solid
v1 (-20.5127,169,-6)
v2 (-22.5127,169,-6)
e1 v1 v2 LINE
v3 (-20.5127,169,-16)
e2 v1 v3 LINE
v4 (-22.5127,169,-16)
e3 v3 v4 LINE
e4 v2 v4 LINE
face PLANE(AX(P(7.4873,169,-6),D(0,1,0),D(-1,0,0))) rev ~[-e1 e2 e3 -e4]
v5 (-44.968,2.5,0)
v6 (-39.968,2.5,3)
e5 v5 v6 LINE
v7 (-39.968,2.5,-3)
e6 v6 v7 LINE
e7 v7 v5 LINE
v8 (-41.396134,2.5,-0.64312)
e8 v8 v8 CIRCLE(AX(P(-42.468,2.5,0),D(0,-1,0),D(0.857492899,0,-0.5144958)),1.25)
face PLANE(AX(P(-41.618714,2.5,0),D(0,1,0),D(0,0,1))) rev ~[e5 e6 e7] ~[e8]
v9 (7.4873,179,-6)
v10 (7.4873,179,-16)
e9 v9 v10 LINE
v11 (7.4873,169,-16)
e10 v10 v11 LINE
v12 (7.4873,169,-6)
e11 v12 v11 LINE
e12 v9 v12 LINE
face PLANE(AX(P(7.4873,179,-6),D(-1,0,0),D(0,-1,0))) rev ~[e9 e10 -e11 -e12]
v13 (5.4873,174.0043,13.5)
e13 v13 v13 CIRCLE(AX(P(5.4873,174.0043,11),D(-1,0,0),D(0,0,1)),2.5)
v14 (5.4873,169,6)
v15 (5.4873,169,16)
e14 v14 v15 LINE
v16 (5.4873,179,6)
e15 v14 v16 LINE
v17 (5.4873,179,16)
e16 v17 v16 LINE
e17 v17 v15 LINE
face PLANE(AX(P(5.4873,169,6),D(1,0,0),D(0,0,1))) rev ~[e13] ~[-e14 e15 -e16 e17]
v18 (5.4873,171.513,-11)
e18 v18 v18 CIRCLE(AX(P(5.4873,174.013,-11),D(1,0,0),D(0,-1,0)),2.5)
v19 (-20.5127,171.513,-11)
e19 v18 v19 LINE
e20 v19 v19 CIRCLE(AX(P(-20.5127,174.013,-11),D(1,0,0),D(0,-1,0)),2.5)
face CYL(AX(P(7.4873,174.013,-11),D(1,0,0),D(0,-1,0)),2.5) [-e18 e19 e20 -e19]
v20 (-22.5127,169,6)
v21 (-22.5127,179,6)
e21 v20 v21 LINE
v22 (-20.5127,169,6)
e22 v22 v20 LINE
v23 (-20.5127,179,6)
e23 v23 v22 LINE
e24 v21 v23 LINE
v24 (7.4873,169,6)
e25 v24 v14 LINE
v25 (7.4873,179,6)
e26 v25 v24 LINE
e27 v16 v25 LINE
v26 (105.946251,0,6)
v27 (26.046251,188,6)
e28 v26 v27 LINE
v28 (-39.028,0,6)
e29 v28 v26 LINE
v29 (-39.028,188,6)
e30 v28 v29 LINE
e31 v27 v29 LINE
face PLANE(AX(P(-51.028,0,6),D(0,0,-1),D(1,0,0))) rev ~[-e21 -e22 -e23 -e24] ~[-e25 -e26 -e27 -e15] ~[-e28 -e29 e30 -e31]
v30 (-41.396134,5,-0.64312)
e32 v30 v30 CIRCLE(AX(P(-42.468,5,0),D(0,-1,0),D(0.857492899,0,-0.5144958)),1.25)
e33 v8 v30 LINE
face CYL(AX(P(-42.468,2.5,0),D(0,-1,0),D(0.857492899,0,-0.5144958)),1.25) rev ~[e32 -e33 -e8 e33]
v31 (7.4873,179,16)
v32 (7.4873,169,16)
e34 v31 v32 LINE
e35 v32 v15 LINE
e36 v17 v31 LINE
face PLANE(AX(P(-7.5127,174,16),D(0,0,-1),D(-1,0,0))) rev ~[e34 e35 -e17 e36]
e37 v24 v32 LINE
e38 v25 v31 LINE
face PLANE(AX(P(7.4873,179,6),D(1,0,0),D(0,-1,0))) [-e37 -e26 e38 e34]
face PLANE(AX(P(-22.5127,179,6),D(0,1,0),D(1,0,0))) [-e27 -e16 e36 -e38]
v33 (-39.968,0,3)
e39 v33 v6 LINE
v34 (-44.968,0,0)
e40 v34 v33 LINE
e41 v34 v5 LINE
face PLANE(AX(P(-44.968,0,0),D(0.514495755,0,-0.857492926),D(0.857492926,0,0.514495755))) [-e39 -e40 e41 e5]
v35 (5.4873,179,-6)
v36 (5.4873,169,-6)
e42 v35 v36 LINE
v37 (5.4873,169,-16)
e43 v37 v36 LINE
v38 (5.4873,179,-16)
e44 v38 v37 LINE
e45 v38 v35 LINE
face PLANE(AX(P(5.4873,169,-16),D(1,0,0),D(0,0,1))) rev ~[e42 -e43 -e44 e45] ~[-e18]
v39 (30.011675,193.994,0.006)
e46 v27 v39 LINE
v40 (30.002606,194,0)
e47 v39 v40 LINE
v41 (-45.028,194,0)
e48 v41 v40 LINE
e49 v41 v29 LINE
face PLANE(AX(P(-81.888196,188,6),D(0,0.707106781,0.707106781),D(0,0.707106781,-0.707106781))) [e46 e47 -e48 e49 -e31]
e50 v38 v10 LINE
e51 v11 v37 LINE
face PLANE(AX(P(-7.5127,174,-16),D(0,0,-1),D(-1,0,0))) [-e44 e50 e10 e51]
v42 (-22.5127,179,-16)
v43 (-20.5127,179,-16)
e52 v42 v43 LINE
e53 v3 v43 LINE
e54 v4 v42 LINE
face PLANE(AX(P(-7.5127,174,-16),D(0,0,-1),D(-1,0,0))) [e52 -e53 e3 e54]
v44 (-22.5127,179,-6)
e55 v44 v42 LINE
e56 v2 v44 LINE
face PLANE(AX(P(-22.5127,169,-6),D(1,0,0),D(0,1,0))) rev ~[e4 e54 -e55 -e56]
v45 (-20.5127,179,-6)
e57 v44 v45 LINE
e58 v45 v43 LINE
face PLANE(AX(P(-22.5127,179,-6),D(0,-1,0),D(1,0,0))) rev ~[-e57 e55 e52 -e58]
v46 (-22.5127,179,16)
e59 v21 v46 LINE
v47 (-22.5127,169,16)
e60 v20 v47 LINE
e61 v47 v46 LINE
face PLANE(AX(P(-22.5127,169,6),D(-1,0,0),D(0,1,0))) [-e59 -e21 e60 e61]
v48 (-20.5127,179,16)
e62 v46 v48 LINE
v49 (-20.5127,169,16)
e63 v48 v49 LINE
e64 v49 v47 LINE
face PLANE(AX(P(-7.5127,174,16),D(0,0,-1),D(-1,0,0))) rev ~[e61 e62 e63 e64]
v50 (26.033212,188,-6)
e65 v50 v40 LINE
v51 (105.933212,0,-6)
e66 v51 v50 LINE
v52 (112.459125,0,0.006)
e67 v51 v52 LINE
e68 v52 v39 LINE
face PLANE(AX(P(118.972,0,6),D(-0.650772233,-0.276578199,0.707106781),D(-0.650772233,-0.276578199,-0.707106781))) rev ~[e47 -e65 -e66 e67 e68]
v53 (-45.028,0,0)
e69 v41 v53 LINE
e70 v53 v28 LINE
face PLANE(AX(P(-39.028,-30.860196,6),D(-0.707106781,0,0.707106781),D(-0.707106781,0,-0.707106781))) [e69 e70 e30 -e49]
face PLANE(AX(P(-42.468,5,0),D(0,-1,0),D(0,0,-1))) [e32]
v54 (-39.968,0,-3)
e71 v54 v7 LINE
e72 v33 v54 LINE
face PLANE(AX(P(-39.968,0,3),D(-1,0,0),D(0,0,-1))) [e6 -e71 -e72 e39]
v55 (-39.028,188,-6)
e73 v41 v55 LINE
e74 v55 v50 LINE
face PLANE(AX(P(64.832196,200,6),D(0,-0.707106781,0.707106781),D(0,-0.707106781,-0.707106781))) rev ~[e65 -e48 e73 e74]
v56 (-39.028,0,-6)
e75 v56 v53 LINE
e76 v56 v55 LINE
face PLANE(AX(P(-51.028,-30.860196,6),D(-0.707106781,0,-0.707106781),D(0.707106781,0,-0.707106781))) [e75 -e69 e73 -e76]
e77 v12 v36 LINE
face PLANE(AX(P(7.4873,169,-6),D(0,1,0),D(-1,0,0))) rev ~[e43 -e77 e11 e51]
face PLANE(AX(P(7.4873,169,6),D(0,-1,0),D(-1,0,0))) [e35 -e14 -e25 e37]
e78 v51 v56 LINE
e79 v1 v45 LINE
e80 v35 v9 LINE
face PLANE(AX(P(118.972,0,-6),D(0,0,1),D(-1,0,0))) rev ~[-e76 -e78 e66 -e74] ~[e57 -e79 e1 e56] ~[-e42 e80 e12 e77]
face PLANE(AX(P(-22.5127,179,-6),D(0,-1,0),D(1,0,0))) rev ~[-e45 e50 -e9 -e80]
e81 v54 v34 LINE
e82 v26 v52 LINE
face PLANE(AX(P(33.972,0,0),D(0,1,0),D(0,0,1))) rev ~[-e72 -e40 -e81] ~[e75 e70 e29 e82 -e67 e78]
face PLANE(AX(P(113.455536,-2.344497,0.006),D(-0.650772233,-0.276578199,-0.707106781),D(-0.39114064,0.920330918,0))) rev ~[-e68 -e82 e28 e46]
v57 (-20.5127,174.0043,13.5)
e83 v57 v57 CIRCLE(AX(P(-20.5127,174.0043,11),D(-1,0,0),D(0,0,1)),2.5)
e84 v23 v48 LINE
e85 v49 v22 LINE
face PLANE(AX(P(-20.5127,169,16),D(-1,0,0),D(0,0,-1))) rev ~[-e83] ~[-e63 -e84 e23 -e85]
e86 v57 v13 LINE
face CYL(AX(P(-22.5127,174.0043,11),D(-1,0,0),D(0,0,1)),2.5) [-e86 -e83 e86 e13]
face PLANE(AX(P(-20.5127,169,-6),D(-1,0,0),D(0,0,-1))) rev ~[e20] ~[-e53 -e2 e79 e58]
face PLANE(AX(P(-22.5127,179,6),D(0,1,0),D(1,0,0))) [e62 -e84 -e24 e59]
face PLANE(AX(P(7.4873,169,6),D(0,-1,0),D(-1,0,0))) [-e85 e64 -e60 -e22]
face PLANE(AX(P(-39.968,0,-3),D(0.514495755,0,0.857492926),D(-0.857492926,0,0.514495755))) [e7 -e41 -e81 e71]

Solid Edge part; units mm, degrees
sketch "Sketch1" plane through (0, 0, 0) normal (0, -1, 0) x (1, 0, 0)
  line L0 (-51.028, 6) -> (118.972, 6)
  line L1 (118.972, 6) -> (118.972, -6)
  line L2 (118.972, -6) -> (-51.028, -6)
  line L3 (-51.028, -6) -> (-51.028, 6)
extrude "Protrusion1" add sketch "Sketch1" against normal blind 200
sketch "Sketch2" plane through (33.972, 100, 6) normal (0, 0, 1) x (0, 1, 0)
  line L0 (-100, -85) -> (100, 0)
extrude "ExtrudedCutout_3" cut sketch "Sketch2" against normal blind 139.4118 material side at (76.518, 100.0196, 6)
sketch "Sketch3" plane through (33.972, 0, 0) normal (0, -1, 0) x (1, 0, 0)
  line L0 (-73.94, 3) -> (-73.94, -3)
  line L1 (-73.94, -3) -> (-78.94, 0)
  line L2 (-78.94, 0) -> (-73.94, 3)
extrude "ExtrudedCutout_4" cut sketch "Sketch3" against normal blind 2.5
sketch "Sketch4" plane through (-42.468, 2.5, 0) normal (0, -1, 0) x (0.8574929, 0, -0.5144958)
  circle A0 centre (0, 0) radius 1.25
extrude "ExtrudedCutout_5" cut sketch "Sketch4" against normal blind 2.5
chamfer "Chamfer_6" distance 12 angle 45 2 edges at (76.472, 100, 6) (76.472, 100, -6)
chamfer "Chamfer_7" distance 12 angle 45 2 edges at (-15.0474, 200, 6) (-15.0474, 200, -6)
chamfer "Chamfer_8" distance 12 angle 45 2 edges at (-51.028, 94, 6) (-51.028, 94, -6)
sketch "Sketch5" plane through (33.4526, 94, 6) normal (0, 0, 1) x (1, 0, 0)
  line L0 (-55.9653, 75) -> (-55.9653, 85)
  line L1 (-55.9653, 85) -> (-25.9653, 85)
  line L2 (-25.9653, 85) -> (-25.9653, 75)
  line L3 (-25.9653, 75) -> (-55.9653, 75)
extrude "ExtrudedProtrusion_2" add sketch "Sketch5" along normal blind 10
sketch "Sketch6" plane through (-7.5127, 174, 16) normal (0, 0, 1) x (0, -1, 0)
  line L0 (3, 13) -> (3, -13)
  line L1 (3, -13) -> (-3, -13)
  line L2 (-3, -13) -> (-3, 13)
  line L3 (-3, 13) -> (3, 13)
extrude "ExtrudedCutout_6" cut sketch "Sketch6" against normal blind 10
sketch "Sketch7" plane through (-7.5127, 169, 11) normal (0, -1, 0) x (1, 0, 0)
  line L0 (13, 5) -> (-13, 5)
  line L1 (-13, 5) -> (-13, -5)
  line L2 (-13, -5) -> (13, -5)
  line L3 (13, -5) -> (13, 5)
extrude "ExtrudedCutout_7" cut sketch "Sketch7" against normal blind 74.3913
sketch "Sketch8" plane through (-22.5127, 174, 11) normal (-1, 0, 0) x (0, 0, 1)
  circle A0 centre (0, 0.0043) radius 2.5
extrude "ExtrudedProtrusion_3" add sketch "Sketch8" against normal blind 30
sketch "Sketch9" plane through (33.4526, 94, -6) normal (0, 0, -1) x (0, -1, 0)
  line L0 (-75, 25.9653) -> (-75, 55.9653)
  line L1 (-75, 55.9653) -> (-85, 55.9653)
  line L2 (-85, 55.9653) -> (-85, 25.9653)
  line L3 (-85, 25.9653) -> (-75, 25.9653)
extrude "ExtrudedProtrusion_4" add sketch "Sketch9" along normal blind 10
sketch "Sketch10" plane through (-7.5127, 174, -16) normal (0, 0, -1) x (0, -1, 0)
  line L0 (3, 13) -> (3, -13)
  line L1 (3, -13) -> (-3, -13)
  line L2 (-3, -13) -> (-3, 13)
  line L3 (-3, 13) -> (3, 13)
extrude "ExtrudedCutout_8" cut sketch "Sketch10" against normal blind 10
sketch "Sketch11" plane through (-7.5127, 169, -11) normal (0, -1, 0) x (-1, 0, 0)
  line L0 (13, -5) -> (13, 5)
  line L1 (13, 5) -> (-13, 5)
  line L2 (-13, 5) -> (-13, -5)
  line L3 (-13, -5) -> (13, -5)
extrude "ExtrudedCutout_9" cut sketch "Sketch11" against normal blind 63.7018
sketch "Sketch12" plane through (7.4873, 174, -11) normal (1, 0, 0) x (0, -1, 0)
  circle A0 centre (-0.013, 0) radius 2.5
extrude "ExtrudedProtrusion_5" add sketch "Sketch12" against normal blind 30
